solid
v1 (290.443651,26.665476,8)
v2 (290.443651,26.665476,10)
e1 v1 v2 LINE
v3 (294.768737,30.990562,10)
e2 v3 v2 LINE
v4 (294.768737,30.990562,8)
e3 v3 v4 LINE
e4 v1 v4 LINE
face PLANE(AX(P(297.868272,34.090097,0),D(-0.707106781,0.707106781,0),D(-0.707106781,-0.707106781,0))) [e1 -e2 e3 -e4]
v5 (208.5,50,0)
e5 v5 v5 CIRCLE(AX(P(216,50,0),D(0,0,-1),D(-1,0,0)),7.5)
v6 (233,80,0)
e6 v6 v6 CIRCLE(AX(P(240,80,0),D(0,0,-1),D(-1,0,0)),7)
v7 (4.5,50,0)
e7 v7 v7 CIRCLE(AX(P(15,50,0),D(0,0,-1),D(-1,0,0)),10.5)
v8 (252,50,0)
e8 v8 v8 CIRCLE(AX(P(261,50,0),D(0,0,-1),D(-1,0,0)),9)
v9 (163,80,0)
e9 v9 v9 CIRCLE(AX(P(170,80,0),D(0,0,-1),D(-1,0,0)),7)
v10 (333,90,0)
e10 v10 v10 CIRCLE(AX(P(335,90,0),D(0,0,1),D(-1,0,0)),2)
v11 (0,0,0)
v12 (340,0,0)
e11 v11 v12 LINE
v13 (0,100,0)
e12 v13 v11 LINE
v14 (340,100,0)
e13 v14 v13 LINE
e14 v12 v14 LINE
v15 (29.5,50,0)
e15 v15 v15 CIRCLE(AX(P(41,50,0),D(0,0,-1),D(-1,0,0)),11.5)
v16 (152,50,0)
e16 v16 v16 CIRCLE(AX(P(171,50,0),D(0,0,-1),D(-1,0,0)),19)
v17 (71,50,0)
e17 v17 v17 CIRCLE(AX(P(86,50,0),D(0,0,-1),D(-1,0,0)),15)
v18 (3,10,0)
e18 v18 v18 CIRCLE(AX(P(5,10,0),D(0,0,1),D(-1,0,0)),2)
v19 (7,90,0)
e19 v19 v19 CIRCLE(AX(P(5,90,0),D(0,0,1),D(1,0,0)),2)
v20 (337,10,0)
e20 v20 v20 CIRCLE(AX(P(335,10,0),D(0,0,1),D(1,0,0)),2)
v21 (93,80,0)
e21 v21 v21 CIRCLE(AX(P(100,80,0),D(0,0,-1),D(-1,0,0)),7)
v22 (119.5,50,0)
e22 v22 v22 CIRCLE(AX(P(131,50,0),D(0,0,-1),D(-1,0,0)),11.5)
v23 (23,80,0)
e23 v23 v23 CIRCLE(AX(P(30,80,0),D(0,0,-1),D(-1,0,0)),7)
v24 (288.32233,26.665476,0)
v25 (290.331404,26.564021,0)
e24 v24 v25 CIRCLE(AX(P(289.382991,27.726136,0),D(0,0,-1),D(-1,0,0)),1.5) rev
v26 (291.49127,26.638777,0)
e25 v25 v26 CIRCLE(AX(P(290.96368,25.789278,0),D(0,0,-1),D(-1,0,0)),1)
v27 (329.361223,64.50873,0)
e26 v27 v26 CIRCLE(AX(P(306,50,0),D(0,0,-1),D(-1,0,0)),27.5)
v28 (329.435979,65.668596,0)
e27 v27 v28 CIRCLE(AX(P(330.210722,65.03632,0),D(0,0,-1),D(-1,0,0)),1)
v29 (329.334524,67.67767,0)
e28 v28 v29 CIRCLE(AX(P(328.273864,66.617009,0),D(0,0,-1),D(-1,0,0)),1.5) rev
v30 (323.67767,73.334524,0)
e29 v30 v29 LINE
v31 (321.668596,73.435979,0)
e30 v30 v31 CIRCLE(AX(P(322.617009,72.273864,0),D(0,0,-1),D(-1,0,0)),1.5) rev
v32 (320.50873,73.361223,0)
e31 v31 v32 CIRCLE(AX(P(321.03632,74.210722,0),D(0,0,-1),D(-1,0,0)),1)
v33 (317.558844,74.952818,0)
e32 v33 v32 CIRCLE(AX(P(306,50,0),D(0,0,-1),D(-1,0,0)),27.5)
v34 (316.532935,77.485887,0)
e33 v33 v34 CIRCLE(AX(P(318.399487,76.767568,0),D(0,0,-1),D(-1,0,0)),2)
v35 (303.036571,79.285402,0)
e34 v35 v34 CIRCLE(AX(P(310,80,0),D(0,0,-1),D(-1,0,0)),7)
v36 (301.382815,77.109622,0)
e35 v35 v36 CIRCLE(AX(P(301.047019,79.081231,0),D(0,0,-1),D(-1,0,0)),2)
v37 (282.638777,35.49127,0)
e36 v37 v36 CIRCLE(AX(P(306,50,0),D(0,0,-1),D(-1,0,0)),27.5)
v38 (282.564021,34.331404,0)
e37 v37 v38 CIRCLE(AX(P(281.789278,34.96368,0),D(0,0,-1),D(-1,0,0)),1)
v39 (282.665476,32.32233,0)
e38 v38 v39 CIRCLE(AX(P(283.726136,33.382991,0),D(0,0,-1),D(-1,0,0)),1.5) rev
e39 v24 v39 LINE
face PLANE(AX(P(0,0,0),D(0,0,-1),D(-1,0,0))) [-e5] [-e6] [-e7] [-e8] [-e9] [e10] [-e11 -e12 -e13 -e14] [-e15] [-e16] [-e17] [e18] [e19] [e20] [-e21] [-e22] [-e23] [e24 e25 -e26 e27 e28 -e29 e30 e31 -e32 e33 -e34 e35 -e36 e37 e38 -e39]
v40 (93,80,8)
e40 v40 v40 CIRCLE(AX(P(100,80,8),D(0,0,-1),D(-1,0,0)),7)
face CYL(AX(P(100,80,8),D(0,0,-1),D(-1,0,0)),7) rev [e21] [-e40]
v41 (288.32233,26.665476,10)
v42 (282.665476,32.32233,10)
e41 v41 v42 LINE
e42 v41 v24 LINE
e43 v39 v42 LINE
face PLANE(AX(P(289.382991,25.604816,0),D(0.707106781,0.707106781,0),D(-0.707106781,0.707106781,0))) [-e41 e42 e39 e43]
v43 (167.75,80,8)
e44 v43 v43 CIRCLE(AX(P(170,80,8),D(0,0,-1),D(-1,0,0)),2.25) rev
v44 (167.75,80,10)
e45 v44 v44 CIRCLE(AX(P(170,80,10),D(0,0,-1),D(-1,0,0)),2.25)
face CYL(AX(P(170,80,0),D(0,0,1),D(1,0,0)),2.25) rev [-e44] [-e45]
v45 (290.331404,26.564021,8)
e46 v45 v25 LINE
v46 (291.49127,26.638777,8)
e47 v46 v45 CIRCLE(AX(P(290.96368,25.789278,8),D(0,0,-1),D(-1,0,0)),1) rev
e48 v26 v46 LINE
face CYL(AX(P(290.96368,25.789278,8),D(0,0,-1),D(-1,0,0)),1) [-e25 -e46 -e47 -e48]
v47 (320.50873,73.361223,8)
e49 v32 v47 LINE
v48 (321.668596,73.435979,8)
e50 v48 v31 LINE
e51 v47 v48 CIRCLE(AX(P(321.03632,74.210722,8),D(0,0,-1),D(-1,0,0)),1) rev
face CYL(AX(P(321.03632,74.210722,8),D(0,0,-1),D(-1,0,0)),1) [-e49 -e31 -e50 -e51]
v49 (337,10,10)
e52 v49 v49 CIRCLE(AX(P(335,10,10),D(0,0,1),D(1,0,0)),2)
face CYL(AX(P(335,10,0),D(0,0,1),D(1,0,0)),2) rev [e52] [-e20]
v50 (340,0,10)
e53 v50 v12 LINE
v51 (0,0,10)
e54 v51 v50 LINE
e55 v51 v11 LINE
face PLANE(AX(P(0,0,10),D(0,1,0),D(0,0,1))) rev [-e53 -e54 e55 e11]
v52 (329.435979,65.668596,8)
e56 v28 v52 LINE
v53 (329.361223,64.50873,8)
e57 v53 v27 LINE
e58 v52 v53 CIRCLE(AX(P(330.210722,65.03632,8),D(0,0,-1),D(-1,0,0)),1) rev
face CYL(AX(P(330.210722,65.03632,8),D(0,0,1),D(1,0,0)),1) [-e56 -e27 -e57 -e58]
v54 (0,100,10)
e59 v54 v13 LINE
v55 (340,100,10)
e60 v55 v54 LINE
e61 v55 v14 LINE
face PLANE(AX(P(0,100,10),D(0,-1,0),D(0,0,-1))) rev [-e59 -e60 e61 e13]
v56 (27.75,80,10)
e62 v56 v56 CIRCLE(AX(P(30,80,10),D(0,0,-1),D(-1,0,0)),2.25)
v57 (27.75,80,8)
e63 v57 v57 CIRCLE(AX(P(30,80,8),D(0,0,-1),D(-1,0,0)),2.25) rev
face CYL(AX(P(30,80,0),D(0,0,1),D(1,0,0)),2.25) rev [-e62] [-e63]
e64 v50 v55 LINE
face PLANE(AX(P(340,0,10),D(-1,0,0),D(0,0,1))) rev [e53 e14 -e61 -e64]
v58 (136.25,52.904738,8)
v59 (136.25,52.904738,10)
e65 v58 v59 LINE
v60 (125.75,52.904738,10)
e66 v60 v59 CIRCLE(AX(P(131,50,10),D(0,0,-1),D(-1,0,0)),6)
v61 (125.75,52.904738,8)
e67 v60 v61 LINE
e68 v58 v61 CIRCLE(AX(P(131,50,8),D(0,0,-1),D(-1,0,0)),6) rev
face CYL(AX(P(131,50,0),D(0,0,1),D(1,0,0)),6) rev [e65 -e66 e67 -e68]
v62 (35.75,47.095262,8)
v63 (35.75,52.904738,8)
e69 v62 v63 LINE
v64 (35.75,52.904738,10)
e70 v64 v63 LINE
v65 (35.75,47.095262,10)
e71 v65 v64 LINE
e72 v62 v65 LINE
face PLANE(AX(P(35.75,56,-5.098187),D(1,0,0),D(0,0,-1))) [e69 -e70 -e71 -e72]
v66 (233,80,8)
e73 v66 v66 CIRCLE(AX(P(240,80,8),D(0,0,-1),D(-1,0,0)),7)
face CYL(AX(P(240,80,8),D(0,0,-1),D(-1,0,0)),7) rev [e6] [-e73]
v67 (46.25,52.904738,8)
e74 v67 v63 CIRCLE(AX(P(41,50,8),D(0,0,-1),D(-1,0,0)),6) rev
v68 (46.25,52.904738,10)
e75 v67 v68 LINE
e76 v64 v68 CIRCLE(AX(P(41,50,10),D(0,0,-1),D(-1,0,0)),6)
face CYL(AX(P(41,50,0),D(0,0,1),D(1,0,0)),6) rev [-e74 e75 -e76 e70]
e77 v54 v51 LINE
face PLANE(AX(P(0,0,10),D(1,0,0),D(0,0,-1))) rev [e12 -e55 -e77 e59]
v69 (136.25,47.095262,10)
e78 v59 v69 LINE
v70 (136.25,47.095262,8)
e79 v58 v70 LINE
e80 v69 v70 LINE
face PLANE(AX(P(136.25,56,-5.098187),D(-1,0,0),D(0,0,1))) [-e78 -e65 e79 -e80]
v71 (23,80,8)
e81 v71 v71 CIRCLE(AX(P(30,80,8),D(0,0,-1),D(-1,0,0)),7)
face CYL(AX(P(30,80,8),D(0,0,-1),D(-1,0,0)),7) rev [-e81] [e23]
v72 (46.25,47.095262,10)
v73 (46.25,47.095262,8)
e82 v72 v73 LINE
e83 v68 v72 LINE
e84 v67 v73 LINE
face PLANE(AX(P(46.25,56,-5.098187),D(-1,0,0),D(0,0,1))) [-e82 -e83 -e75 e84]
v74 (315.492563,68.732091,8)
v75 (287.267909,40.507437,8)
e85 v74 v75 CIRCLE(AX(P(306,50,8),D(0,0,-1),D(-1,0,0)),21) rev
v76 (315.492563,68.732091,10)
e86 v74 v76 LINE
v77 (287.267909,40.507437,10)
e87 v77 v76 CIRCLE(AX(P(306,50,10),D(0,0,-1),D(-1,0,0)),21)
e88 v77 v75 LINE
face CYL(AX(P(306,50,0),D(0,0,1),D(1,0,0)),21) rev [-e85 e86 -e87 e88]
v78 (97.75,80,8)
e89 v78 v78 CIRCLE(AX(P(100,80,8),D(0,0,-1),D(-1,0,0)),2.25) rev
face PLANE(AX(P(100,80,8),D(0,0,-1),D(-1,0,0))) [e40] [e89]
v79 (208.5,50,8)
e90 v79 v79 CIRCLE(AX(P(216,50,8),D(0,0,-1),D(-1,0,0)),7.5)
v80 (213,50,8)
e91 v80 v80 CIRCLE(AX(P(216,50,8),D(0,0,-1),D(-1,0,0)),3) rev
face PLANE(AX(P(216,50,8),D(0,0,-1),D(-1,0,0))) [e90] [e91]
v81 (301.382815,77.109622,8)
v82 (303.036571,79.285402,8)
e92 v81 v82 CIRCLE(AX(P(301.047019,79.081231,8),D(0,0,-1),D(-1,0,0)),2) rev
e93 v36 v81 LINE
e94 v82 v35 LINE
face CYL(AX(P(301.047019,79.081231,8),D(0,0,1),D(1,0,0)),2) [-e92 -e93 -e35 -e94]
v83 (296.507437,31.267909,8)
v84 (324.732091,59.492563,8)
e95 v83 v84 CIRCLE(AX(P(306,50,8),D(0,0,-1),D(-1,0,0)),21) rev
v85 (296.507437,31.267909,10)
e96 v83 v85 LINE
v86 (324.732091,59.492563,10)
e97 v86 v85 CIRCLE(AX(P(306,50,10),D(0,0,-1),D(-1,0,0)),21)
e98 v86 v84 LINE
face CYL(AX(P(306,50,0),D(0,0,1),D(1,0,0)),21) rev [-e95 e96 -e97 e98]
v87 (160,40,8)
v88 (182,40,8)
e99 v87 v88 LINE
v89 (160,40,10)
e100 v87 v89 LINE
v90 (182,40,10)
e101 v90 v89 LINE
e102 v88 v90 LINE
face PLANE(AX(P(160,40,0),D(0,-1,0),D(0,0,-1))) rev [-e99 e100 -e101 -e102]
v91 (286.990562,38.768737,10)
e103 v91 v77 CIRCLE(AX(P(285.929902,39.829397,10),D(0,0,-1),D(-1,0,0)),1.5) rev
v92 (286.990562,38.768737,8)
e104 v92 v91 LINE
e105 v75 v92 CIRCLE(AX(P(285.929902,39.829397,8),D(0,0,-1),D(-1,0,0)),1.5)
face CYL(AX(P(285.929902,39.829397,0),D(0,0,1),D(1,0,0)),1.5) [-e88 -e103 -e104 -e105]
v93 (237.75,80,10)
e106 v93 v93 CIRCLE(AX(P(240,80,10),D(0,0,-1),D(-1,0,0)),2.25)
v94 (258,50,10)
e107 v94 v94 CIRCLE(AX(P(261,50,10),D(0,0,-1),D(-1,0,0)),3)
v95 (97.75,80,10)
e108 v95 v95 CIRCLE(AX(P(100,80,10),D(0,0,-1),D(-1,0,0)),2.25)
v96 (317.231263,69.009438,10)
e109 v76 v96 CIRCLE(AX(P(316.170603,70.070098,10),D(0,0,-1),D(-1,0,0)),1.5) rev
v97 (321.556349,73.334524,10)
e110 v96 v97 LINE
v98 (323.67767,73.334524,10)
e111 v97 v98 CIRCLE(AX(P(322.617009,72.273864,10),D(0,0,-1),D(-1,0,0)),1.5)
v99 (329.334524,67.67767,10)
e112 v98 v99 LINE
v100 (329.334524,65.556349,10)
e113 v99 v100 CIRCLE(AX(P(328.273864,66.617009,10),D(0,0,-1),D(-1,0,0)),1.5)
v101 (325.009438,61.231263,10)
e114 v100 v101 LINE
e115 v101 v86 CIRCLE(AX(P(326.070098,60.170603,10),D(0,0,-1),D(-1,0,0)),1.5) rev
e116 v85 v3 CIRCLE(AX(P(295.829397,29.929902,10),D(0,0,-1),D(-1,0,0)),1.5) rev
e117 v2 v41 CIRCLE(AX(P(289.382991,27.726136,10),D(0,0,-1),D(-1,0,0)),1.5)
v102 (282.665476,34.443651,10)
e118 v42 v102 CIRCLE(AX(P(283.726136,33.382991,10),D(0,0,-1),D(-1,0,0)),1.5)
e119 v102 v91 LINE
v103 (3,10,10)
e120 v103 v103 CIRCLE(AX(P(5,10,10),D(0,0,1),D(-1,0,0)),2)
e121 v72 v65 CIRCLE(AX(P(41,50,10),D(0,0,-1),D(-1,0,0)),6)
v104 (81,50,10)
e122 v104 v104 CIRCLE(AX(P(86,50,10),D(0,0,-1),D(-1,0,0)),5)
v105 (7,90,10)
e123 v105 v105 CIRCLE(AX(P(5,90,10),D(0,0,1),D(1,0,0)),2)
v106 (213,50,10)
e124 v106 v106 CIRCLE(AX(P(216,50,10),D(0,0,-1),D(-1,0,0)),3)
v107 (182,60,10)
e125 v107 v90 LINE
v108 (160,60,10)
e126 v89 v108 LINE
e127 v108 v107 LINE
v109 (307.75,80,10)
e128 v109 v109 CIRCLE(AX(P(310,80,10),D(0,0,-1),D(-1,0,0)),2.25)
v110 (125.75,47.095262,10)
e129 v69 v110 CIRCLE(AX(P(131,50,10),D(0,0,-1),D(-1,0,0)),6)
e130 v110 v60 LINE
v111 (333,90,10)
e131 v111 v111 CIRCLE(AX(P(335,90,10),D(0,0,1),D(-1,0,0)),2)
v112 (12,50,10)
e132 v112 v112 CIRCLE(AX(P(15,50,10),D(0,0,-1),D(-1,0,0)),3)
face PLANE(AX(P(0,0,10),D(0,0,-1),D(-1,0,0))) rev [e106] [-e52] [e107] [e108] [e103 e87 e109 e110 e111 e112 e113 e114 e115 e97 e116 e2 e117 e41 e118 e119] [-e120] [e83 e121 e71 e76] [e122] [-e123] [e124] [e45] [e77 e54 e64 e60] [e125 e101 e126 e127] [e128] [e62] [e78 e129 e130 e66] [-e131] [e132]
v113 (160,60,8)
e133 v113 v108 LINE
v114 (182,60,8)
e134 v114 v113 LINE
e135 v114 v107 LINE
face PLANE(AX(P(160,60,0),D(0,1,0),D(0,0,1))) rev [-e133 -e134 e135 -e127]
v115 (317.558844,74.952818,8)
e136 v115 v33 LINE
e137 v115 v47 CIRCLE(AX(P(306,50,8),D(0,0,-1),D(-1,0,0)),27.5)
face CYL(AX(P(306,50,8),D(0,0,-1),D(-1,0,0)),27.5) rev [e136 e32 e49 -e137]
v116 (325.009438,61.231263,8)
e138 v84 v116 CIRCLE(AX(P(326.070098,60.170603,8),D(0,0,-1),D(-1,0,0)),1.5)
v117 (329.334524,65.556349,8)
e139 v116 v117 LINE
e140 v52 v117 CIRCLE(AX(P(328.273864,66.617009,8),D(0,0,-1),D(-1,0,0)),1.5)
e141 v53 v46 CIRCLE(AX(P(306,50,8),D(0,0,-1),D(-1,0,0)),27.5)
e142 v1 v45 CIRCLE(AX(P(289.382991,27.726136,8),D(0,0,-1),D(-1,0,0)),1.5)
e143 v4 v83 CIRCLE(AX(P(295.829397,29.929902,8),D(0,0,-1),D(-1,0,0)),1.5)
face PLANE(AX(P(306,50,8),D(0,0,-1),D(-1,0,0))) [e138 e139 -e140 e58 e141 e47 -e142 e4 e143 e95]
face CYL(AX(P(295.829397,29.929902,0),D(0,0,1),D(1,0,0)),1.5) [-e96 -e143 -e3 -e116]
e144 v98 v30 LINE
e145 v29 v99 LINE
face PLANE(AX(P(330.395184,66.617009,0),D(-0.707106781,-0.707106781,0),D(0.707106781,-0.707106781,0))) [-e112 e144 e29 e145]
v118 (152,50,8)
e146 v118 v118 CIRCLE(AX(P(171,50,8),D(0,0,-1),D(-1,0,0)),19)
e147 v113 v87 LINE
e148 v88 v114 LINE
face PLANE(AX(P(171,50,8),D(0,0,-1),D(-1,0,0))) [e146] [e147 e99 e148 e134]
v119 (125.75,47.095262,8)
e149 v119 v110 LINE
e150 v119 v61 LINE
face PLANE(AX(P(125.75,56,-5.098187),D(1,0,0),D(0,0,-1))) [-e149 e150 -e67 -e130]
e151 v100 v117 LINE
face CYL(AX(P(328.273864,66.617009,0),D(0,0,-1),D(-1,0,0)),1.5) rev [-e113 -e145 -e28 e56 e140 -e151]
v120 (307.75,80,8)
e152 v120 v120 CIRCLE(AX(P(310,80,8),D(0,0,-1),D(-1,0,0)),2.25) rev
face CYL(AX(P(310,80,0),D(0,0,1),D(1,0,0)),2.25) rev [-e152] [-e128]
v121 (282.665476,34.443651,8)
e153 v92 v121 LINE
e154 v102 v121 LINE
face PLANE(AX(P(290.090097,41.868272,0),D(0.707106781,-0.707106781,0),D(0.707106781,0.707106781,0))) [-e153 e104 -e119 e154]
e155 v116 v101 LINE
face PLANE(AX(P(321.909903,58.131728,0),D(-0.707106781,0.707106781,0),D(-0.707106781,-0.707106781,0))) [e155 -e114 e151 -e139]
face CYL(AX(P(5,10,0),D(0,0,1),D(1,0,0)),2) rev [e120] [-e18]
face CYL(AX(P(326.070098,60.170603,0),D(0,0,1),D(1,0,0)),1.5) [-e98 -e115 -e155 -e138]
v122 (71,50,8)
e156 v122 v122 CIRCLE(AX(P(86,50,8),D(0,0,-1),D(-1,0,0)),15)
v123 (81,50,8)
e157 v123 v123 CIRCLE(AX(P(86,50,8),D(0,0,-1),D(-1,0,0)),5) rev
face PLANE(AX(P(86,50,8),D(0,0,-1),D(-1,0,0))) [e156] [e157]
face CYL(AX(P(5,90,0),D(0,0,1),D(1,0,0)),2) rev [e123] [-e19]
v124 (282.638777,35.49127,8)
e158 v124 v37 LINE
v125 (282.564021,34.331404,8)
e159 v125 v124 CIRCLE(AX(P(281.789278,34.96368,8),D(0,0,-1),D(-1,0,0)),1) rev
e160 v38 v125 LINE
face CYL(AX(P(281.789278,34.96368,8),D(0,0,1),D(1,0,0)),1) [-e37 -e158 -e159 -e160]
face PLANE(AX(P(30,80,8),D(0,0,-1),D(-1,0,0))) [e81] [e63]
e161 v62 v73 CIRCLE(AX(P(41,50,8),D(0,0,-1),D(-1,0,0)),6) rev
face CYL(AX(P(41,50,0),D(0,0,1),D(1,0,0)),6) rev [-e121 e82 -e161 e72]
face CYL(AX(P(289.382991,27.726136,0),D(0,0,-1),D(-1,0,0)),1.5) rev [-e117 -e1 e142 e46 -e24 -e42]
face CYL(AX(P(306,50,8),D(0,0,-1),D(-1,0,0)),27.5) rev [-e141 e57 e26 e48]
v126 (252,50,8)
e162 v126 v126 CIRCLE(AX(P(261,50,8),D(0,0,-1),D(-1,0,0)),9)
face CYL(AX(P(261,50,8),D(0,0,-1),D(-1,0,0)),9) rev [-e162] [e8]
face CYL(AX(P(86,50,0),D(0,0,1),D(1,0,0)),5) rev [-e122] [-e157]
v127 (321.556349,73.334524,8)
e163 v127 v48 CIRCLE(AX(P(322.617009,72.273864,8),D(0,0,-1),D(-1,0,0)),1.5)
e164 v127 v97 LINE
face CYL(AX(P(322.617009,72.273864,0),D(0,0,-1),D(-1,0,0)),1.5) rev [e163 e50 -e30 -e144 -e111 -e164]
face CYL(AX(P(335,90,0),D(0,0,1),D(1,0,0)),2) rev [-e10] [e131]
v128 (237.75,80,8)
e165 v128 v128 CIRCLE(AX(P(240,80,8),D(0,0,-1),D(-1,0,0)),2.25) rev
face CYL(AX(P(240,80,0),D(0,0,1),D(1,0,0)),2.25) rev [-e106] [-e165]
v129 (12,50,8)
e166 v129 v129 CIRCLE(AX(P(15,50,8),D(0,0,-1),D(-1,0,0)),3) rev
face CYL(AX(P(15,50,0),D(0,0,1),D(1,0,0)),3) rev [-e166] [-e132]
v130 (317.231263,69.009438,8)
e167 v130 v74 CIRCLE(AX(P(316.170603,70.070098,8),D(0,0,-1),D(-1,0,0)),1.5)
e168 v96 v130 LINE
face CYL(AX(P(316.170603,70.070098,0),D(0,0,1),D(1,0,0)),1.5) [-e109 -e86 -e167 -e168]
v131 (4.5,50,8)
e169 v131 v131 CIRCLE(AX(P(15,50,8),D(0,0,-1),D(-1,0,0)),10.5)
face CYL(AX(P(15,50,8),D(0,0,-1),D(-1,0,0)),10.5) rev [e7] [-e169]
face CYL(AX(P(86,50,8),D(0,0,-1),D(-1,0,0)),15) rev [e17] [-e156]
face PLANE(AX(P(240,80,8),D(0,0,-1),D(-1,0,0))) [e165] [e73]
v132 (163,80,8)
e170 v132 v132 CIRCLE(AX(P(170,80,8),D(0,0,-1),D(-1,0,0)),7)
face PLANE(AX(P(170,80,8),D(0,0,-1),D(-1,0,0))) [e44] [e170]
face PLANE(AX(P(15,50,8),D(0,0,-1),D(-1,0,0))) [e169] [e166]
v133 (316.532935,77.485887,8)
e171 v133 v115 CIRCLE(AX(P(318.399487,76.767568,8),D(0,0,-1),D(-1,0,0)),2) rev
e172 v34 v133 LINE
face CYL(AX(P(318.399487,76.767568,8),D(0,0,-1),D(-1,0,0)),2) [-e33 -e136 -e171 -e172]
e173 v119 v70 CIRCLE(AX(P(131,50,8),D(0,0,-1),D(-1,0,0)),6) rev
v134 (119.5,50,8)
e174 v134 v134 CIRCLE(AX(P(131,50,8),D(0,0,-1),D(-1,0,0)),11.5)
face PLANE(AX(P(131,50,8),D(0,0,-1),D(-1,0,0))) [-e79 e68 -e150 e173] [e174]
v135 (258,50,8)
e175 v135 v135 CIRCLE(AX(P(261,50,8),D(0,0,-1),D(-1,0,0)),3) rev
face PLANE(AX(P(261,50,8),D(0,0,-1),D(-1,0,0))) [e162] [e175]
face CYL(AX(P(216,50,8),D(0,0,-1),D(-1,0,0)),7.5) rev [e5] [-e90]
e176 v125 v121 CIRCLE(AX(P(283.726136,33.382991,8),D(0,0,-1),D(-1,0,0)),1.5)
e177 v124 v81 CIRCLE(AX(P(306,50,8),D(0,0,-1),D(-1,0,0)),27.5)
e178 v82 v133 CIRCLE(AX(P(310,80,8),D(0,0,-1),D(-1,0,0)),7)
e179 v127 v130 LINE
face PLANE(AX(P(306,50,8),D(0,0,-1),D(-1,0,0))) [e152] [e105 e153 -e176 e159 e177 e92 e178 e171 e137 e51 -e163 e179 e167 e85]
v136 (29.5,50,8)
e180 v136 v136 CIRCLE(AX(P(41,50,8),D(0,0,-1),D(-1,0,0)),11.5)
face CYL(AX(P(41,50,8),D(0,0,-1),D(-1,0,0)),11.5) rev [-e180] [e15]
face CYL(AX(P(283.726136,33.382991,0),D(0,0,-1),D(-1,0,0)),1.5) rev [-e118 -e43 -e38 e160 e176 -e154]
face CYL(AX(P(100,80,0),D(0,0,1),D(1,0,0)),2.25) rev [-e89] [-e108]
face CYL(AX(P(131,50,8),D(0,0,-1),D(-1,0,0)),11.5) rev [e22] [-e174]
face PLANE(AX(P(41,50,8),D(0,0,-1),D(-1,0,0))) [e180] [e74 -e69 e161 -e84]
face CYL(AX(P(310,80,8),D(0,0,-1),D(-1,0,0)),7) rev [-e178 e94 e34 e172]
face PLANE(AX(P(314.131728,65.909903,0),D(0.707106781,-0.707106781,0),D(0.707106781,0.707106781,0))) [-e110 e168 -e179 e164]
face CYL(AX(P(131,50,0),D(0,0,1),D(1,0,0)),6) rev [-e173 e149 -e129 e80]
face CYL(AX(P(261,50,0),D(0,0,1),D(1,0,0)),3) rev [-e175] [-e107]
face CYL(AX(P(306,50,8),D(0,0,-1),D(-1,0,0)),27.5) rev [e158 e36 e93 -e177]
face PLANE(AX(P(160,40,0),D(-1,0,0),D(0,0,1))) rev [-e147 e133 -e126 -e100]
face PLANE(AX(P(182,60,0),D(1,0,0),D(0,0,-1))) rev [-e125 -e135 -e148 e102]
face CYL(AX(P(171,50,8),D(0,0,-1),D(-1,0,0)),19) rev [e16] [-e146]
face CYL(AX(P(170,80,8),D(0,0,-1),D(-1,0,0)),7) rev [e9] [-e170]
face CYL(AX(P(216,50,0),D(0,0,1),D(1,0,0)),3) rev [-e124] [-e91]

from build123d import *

# Parameters (mm, degrees)
ESQUISSE1_W                  = 340
ESQUISSE1_H                  = 100.00000000000001
BOSS_EXTRU_1_DEPTH           = 10
ENL_V_MAT_EXTRU_1_DEPTH      = 355.54195802471673
ENL_V_MAT_EXTRU_1_DEPTH_BACK = 355.54195802471673
ESQUISSE2_R                  = 3.0000000000000018
ESQUISSE2_R_2                = 6.0000000000000036
ESQUISSE2_R_3                = 5.000000000000005
ESQUISSE2_R_4                = 6.000000000000017
ESQUISSE2_R_5                = 2.9999999999999947
ESQUISSE2_R_6                = 21.000000000000014
ESQUISSE2_W                  = 22.00000000000003
ESQUISSE2_H                  = 20.000000000000007
ENL_V_MAT_EXTRU_2_DEPTH      = 355.54195802471673
ENL_V_MAT_EXTRU_2_DEPTH_BACK = 355.54195802471673
ESQUISSE3_R                  = 2.2500000000000093
ESQUISSE3_R_2                = 2.2499999999999964
ESQUISSE3_R_3                = 2.2500000000000027
ESQUISSE3_R_4                = 2.2500000000000138
ESQUISSE5_R                  = 27.500000000000032
ESQUISSE5_R_2                = 8.999999999999984
ESQUISSE5_R_3                = 7.5000000000000115
ESQUISSE5_R_4                = 18.99999999999999
ESQUISSE5_R_5                = 11.499999999999993
ESQUISSE5_R_6                = 14.999999999999998
ESQUISSE5_R_7                = 11.499999999999998
ESQUISSE5_R_8                = 10.5
ENL_V_MAT_EXTRU_3_DEPTH      = 8
ESQUISSE6_W                  = 5.2500000000000036
ESQUISSE6_H                  = 11.999999999999993
ESQUISSE6_W_2                = 5.250000000000007
ESQUISSE6_W_3                = 5.25
BOSS_EXTRU_2_DEPTH           = 2
ESQUISSE8_R                  = 2.0000000000000027
ESQUISSE8_R_2                = 2.0000000000000018
ESQUISSE8_R_3                = 1.9999999999999967
ENL_V_MAT_EXTRU_4_DEPTH      = 10
ESQUISSE9_R                  = 6.999999999999988
ESQUISSE9_R_2                = 7.000000000000015
ESQUISSE9_R_3                = 7.000000000000002
ENL_V_MAT_EXTRU_5_DEPTH      = 8
CONG_1_R                     = 2
ENL_V_MAT_EXTRU_6_DEPTH      = 355.49118478405074
ENL_V_MAT_EXTRU_6_DEPTH_BACK = 355.49118478405074
CONG_2_R                     = 1.5
CONG_3_R                     = 1


with BuildPart() as part:
    # Esquisse1 → Boss.-Extru.1 (new body)
    with BuildSketch(Plane.XY):
        with Locations((170, 50.00000000000001)):
            Rectangle(ESQUISSE1_W, ESQUISSE1_H)
    extrude(amount=BOSS_EXTRU_1_DEPTH)

    # Esquisse2 → Enlèv. mat.-Extru.1 (cut, two sides: drawn at the far end of the back side and taken through both)
    with BuildSketch(Plane.XY.offset(10).offset(-ENL_V_MAT_EXTRU_1_DEPTH_BACK)):
        with Locations((15.000000000000007, 50)):
            Circle(ESQUISSE2_R)
        with Locations((41.00000000000001, 49.99999999999999)):
            Circle(ESQUISSE2_R_2)
        with Locations((86, 49.99999999999999)):
            Circle(ESQUISSE2_R_3)
        with Locations((131, 50)):
            Circle(ESQUISSE2_R_4)
        with Locations((216.00000000000003, 50)):
            Circle(ESQUISSE2_R_5)
        with Locations((261, 50)):
            Circle(ESQUISSE2_R_5)
        with Locations((306, 50)):
            Circle(ESQUISSE2_R_6)
        with Locations((171, 50)):
            Rectangle(ESQUISSE2_W, ESQUISSE2_H)
    extrude(amount=ENL_V_MAT_EXTRU_1_DEPTH + ENL_V_MAT_EXTRU_1_DEPTH_BACK, mode=Mode.SUBTRACT)

    # Esquisse3 → Enlèv. mat.-Extru.2 (cut, two sides: drawn at the far end of the back side and taken through both)
    with BuildSketch(Plane.XY.offset(10).offset(-ENL_V_MAT_EXTRU_2_DEPTH_BACK)):
        with Locations((170, 80)):
            Circle(ESQUISSE3_R)
        with Locations((100, 80)):
            Circle(ESQUISSE3_R_2)
        with Locations((30, 80)):
            Circle(ESQUISSE3_R_3)
        with Locations(Location((310.00000000000006, 80, 0), (0, 0, 180))):
            Circle(ESQUISSE3_R_4)
        with Locations(Location((240.00000000000003, 80, 0), (0, 0, 180))):
            Circle(ESQUISSE3_R)
    extrude(amount=ENL_V_MAT_EXTRU_2_DEPTH + ENL_V_MAT_EXTRU_2_DEPTH_BACK, mode=Mode.SUBTRACT)

    # Esquisse5 → Enlèv. mat.-Extru.3 (cut)
    with BuildSketch(Plane(origin=(0, 0, 0), x_dir=(-1, 0, 0), z_dir=(0, 0, -1))):
        with Locations((-306, 50)):
            Circle(ESQUISSE5_R)
        with Locations((-261, 50)):
            Circle(ESQUISSE5_R_2)
        with Locations((-216.00000000000003, 50)):
            Circle(ESQUISSE5_R_3)
        with Locations((-171, 50)):
            Circle(ESQUISSE5_R_4)
        with Locations((-131, 50)):
            Circle(ESQUISSE5_R_5)
        with Locations((-86, 49.99999999999999)):
            Circle(ESQUISSE5_R_6)
        with Locations((-41.00000000000001, 49.99999999999999)):
            Circle(ESQUISSE5_R_7)
        with Locations((-15.000000000000007, 50)):
            Circle(ESQUISSE5_R_8)
    extrude(amount=-ENL_V_MAT_EXTRU_3_DEPTH, mode=Mode.SUBTRACT)

    # Esquisse6 → Boss.-Extru.2 (add)
    with BuildSketch(Plane.XY.offset(10)):
        with Locations((33.12500000000001, 50)):
            Rectangle(ESQUISSE6_W, ESQUISSE6_H)
        with Locations((48.875000000000014, 50)):
            Rectangle(ESQUISSE6_W_2, ESQUISSE6_H)
        with Locations((123.12499999999997, 50)):
            Rectangle(ESQUISSE6_W_3, ESQUISSE6_H)
        with Locations((138.87500000000003, 50)):
            Rectangle(ESQUISSE6_W_3, ESQUISSE6_H)
    extrude(amount=-BOSS_EXTRU_2_DEPTH)

    # Esquisse8 → Enlèv. mat.-Extru.4 (cut)
    with BuildSketch(Plane.XY.offset(10)):
        with Locations((5, 90)):
            Circle(ESQUISSE8_R)
        with Locations(Location((5.00000000000001, 10.000000000000009, 0), (0, 0, 180))):
            Circle(ESQUISSE8_R_2)
        with Locations((335, 10.000000000000009)):
            Circle(ESQUISSE8_R_3)
        with Locations(Location((335, 90, 0), (0, 0, 180))):
            Circle(ESQUISSE8_R_3)
    extrude(amount=-ENL_V_MAT_EXTRU_4_DEPTH, mode=Mode.SUBTRACT)

    # Esquisse9 → Enlèv. mat.-Extru.5 (cut)
    with BuildSketch(Plane(origin=(0, 0, 0), x_dir=(-1, 0, 0), z_dir=(0, 0, -1))):
        with Locations((-310.00000000000006, 80)):
            Circle(ESQUISSE9_R)
        with Locations((-240.00000000000003, 80)):
            Circle(ESQUISSE9_R_2)
        with Locations((-170, 80)):
            Circle(ESQUISSE9_R_2)
        with Locations((-100, 80)):
            Circle(ESQUISSE9_R_3)
        with Locations((-30, 80)):
            Circle(ESQUISSE9_R_3)
    extrude(amount=-ENL_V_MAT_EXTRU_5_DEPTH, mode=Mode.SUBTRACT)

    # Congé1
    cong_1_edges = [part.edges().sort_by_distance(p)[0] for p in [
        (303.5061116987467, 77.38668510683382, 4),
        (315.5823162488517, 75.77652450015313, 4),
    ]]
    fillet(cong_1_edges, radius=CONG_1_R)

    # Esquisse10 → Enlèv. mat.-Extru.6 (cut, two sides: drawn at the far end of the back side and taken through both)
    with BuildSketch(Plane(origin=(0, 0, 8), x_dir=(-1, 0, 0), z_dir=(0, 0, -1)).offset(-ENL_V_MAT_EXTRU_6_DEPTH_BACK)):
        Polygon((-314.13172798364525, 65.90990257669736), (-321.90990257669733, 58.13172798364529), (-330.39518395093586, 66.61700935788389), (-322.6170093578838, 74.39518395093592), align=None)
        Polygon((-290.09009742330267, 41.8682720163547), (-281.60481604906414, 33.382990642116134), (-289.3829906421162, 25.60481604906408), (-297.86827201635475, 34.09009742330265), align=None)
    extrude(amount=ENL_V_MAT_EXTRU_6_DEPTH + ENL_V_MAT_EXTRU_6_DEPTH_BACK, mode=Mode.SUBTRACT)

    # Congé2
    cong_2_edges = [part.edges().sort_by_distance(p)[0] for p in [
        (281.60481604906414, 33.382990642116134, 5),
        (295.55817664855954, 31.780002055507403, 9),
        (289.3829906421162, 25.60481604906408, 5),
        (287.78000205550745, 39.55817664855947, 9),
        (330.39518395093586, 66.61700935788389, 5),
        (324.21999794449255, 60.44182335144051, 9),
        (316.44182335144046, 68.21999794449256, 9),
        (322.6170093578838, 74.39518395093592, 5),
    ]]
    fillet(cong_2_edges, radius=CONG_2_R)

    # Congé3
    # the kernel refuses this fillet: 1 mm, written as the material it takes off along each edge
    with BuildSketch(Plane(origin=(328.9416461797837, 65.16347158673169, 8), x_dir=(0.5395485077638712, -0.8419545164495408, 0), z_dir=(0, 0, -1))) as cong_3_piece_1:
        with BuildLine():
            CenterArc((0.7917838484009534, -0.9999000393817246), CONG_3_R, 90.81013186536997, 71.06099512229089)
            Line((-0.15857520364130714, -0.688744656652602), (-0.2536111088455419, -0.6576291183796682))
            ThreePointArc((-0.2536111088455419, -0.6576291183796682), (-0.216495562393325, -0.5213782577373202), (-0.09768701566509973, 0.02138333394130856))
            Line((-0.09768701566509973, 0.02138333394130856), (0.00141389972929694, 0.09999000393815428))
            ThreePointArc((0.00141389972929694, 0.09999000393815428), (0.3888224255540418, 0.09725108299714401), (0.7762309513787835, 0.09999000393816994))
            Line((0.7762309513787835, 0.09999000393816994), (0.7776448511080656, -5e-17))
        make_face()
    extrude(amount=9.944112127770163, mode=Mode.SUBTRACT)
    with BuildSketch(Plane(origin=(321.1634715867316, 72.94164617978372, 8), x_dir=(0.7147000811371469, 0.6994310502276516, 0), z_dir=(0, 0, -1))) as cong_3_piece_2:
        with BuildLine():
            CenterArc((0.7967561378121499, -0.9959424723360712), CONG_3_R, 95.16315700004625, 71.0609951222958)
            Line((-0.17447860578954866, -0.7578184021101204), (-0.27160208014971443, -0.7340059950875214))
            ThreePointArc((-0.27160208014971443, -0.7340059950875214), (-0.18201092031799704, -0.35708917183648514), (-0.09775794201756788, 0.02105670374221132))
            Line((-0.09775794201756788, 0.02105670374221132), (0.00107968352981501, 0.09999417124750024))
            ThreePointArc((0.00107968352981501, 0.09999417124750024), (0.5566601276180686, 0.093995311039016), (0.6977647438705182, 0.09959424723359925))
            Line((0.6977647438705182, 0.09959424723359925), (0.7067639615015904, -4e-17))
        make_face()
    extrude(amount=9.94411212777035, mode=Mode.SUBTRACT)
    with BuildSketch(Plane(origin=(283.0583538202163, 34.836528413268304, 8), x_dir=(-0.6994310502276408, -0.7147000811371573, 0), z_dir=(0, 0, -1))) as cong_3_piece_3:
        with BuildLine():
            CenterArc((0.7967561378121149, 0.9959424723360829), CONG_3_R, 193.7758478776647, 71.06099512228826)
            Line((-0.17447860578955895, 0.7578184021100173), (-0.27160208014972437, 0.7340059950874168))
            ThreePointArc((-0.27160208014972437, 0.7340059950874168), (-0.18201092031802182, 0.3570891718364219), (-0.09775794201756777, -0.02105670374219269))
            Line((-0.09775794201756777, -0.02105670374219269), (0.00107968352983153, -0.09999417124749502))
            ThreePointArc((0.00107968352983153, -0.09999417124749502), (0.5566601276181505, -0.09399531103902689), (0.6977647438704697, -0.09959424723361945))
            Line((0.6977647438704697, -0.09959424723361945), (0.7067639615015402, 5e-17))
        make_face()
    extrude(amount=9.944112127770104, mode=Mode.SUBTRACT)
    with BuildSketch(Plane(origin=(290.8365284132684, 27.05835382021624, 8), x_dir=(-0.7147000811371251, -0.6994310502276738, 0), z_dir=(0, 0, -1))) as cong_3_piece_4:
        with BuildLine():
            CenterArc((0.7967561378121253, -0.9959424723360709), CONG_3_R, 95.16315700004816, 71.0609951222958)
            Line((-0.17447860578957813, -0.7578184021101529), (-0.27160208014974474, -0.7340059950875569))
            ThreePointArc((-0.27160208014974474, -0.7340059950875569), (-0.18201092031804894, -0.35708917183650773), (-0.0977579420175735, 0.02105670374221336))
            Line((-0.0977579420175735, 0.02105670374221336), (0.00107968352981438, 0.09999417124749772))
            ThreePointArc((0.00107968352981438, 0.09999417124749772), (0.5566601276180955, 0.09399531103900281), (0.6977647438704596, 0.0995942472335964))
            Line((0.6977647438704596, 0.0995942472335964), (0.7067639615015323, -4e-17))
        make_face()
    extrude(amount=9.944112127770445, mode=Mode.SUBTRACT)


solid = part.part
